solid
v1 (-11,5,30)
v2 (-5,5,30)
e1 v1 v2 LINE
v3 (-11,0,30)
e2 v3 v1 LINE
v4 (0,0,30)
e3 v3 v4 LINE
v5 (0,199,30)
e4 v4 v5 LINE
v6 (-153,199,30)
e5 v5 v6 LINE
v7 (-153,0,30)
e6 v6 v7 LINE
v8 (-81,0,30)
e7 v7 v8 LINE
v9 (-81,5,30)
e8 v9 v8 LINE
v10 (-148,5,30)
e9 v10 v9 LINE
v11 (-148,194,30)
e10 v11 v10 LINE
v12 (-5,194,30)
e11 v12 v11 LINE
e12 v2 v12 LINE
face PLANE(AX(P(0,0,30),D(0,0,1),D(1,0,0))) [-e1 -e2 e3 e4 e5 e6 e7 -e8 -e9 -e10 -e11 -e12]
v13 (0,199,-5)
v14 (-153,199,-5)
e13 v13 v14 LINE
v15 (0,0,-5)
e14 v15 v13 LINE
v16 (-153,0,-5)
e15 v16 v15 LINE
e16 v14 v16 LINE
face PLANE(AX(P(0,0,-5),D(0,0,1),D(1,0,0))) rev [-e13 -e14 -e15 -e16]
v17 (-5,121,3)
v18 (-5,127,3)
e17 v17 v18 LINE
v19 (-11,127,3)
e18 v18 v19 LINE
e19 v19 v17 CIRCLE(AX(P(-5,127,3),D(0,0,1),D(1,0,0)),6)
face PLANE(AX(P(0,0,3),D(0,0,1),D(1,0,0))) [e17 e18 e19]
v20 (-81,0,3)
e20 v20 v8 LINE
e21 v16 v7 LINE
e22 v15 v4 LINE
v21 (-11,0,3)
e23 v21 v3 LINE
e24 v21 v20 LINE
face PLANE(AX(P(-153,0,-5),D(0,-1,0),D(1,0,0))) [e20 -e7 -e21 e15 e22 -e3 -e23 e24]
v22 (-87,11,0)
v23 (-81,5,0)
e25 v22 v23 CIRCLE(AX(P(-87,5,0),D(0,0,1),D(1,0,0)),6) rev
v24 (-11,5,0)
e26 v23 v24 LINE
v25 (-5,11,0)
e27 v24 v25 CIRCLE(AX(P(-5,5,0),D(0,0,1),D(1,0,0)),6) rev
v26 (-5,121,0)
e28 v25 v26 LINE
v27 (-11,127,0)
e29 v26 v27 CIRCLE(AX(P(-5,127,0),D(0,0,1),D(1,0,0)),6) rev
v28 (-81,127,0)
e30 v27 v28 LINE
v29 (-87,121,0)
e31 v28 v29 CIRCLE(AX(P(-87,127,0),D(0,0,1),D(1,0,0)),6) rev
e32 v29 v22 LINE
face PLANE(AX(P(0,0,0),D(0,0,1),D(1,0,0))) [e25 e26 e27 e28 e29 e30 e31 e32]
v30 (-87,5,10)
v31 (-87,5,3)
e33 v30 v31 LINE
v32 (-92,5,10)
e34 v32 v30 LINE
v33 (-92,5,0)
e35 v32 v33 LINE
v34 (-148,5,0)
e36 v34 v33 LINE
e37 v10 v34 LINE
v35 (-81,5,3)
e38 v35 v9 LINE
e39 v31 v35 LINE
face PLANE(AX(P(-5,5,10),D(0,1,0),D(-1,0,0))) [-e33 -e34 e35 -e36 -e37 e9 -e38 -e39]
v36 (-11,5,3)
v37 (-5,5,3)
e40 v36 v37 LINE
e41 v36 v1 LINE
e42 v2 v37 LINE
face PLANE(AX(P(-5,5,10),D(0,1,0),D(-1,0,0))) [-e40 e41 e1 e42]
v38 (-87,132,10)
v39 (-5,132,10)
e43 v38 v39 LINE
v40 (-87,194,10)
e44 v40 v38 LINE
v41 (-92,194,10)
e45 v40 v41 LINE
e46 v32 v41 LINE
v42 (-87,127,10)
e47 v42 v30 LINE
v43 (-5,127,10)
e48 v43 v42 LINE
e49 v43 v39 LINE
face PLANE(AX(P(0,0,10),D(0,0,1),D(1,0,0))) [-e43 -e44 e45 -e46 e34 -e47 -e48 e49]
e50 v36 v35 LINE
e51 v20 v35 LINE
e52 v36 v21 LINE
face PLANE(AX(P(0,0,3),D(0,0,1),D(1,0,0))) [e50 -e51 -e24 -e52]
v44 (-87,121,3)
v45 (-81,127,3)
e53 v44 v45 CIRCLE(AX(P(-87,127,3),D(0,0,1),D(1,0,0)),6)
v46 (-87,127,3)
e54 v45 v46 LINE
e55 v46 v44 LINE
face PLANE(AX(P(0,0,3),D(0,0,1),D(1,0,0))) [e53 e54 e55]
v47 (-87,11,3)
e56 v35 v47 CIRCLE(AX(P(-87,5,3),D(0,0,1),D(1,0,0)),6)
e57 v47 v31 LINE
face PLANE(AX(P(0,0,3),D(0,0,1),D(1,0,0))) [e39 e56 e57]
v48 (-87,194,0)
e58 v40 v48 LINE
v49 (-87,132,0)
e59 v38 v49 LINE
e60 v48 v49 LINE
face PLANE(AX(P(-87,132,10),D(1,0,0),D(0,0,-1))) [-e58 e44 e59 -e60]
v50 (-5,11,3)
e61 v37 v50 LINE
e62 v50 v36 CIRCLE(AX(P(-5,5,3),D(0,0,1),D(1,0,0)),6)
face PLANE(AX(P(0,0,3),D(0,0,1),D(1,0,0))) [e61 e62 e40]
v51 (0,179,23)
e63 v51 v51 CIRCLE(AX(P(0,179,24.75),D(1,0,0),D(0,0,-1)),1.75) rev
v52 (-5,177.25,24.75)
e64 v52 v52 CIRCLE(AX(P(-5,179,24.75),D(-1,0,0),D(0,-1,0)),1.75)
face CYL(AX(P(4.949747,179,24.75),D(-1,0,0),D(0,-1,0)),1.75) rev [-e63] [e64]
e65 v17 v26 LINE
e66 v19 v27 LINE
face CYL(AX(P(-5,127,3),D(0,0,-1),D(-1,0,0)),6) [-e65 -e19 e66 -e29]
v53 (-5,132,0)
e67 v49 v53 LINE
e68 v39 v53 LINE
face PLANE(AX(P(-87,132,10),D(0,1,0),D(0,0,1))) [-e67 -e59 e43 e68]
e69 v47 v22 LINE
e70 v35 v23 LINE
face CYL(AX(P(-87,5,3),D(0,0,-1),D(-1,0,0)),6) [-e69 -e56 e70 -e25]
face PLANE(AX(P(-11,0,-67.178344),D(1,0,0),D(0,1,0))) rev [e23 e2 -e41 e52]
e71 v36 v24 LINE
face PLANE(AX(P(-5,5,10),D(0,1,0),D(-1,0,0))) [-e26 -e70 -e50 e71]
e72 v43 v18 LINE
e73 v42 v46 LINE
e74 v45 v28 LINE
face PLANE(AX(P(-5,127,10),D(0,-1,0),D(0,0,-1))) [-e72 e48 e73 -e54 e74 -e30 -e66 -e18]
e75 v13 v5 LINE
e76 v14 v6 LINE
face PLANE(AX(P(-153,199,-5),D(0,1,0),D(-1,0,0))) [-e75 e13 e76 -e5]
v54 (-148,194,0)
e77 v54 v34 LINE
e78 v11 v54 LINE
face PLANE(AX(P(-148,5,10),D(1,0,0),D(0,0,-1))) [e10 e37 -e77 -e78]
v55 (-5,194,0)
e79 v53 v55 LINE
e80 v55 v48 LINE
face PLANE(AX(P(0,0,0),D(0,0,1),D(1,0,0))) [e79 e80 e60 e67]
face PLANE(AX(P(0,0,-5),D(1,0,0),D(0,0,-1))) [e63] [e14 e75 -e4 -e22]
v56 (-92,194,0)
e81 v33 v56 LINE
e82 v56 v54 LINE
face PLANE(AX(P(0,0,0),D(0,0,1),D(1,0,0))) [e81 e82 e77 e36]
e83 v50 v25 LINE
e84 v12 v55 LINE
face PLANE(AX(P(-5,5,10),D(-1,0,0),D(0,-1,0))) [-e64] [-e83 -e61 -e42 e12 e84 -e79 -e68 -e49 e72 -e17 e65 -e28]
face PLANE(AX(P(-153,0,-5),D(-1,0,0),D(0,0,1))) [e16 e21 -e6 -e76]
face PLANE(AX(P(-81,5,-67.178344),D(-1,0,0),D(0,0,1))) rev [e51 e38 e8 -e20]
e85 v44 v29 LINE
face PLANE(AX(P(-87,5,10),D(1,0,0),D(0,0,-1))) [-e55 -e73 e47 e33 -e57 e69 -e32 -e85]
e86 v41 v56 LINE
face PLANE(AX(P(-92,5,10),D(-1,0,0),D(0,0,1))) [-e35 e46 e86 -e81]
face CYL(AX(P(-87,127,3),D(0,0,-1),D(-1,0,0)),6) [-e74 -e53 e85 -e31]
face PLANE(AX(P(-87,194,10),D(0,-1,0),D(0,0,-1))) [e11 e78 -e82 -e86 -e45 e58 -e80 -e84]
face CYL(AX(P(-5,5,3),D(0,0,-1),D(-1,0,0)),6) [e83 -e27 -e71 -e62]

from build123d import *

# Parameters (mm, degrees)
SKETCH1_W           = 199
SKETCH1_H           = 153
BOSS_EXTRUDE1_DEPTH = 5
SKETCH2_W           = 153
SKETCH2_H           = 199
SKETCH2_W_2         = 82
SKETCH2_H_2         = 122
SKETCH2_H_3         = 62
SKETCH2_W_3         = 56
SKETCH2_H_4         = 189
BOSS_EXTRUDE2_DEPTH = 10
SKETCH3_W           = 153
SKETCH3_H           = 199
SKETCH3_W_2         = 143
SKETCH3_H_2         = 189
BOSS_EXTRUDE3_DEPTH = 20
SKETCH4_W           = 6
SKETCH4_H           = 6
BOSS_EXTRUDE4_DEPTH = 3
FILLET1_R           = 6
SKETCH5_W           = 70
SKETCH5_H           = 5
CUT_EXTRUDE1_DEPTH  = 27
SKETCH6_R           = 1.75
CUT_EXTRUDE2_DEPTH  = 5


with BuildPart() as part:
    # Sketch1 → Boss-Extrude1 (new body)
    with BuildSketch(Plane(origin=(0, 0, 0), x_dir=(0, 1, 0), z_dir=(0, 0, 1))):
        with Locations((99.5, 76.5)):
            Rectangle(SKETCH1_W, SKETCH1_H)
    extrude(amount=-BOSS_EXTRUDE1_DEPTH)

    # Sketch2 → Boss-Extrude2 (add)
    with BuildSketch(Plane.XY):
        with Locations((-76.5, 99.5)):
            Rectangle(SKETCH2_W, SKETCH2_H)
        with Locations((-46, 66)):
            Rectangle(SKETCH2_W_2, SKETCH2_H_2, mode=Mode.SUBTRACT)
        with Locations((-46, 163)):
            Rectangle(SKETCH2_W_2, SKETCH2_H_3, mode=Mode.SUBTRACT)
        with Locations((-120, 99.5)):
            Rectangle(SKETCH2_W_3, SKETCH2_H_4, mode=Mode.SUBTRACT)
    extrude(amount=BOSS_EXTRUDE2_DEPTH)

    # Sketch3 → Boss-Extrude3 (add)
    with BuildSketch(Plane.XY.offset(10)):
        with Locations((-76.5, 99.5)):
            Rectangle(SKETCH3_W, SKETCH3_H)
        with Locations((-76.5, 99.5)):
            Rectangle(SKETCH3_W_2, SKETCH3_H_2, mode=Mode.SUBTRACT)
    extrude(amount=BOSS_EXTRUDE3_DEPTH)

    # Sketch4 → Boss-Extrude4 (add)
    with BuildSketch(Plane.XY):
        with Locations((-84, 124)):
            Rectangle(SKETCH4_W, SKETCH4_H)
        with Locations((-8, 124)):
            Rectangle(SKETCH4_W, SKETCH4_H)
        with Locations((-8, 8)):
            Rectangle(SKETCH4_W, SKETCH4_H)
        with Locations((-84, 8)):
            Rectangle(SKETCH4_W, SKETCH4_H)
    extrude(amount=BOSS_EXTRUDE4_DEPTH)

    # Fillet1
    fillet1_edges = [part.edges().sort_by_distance(p)[0] for p in [
        (-81, 11, 1.5),
        (-11, 11, 1.5),
        (-81, 121, 1.5),
        (-11, 121, 1.5),
    ]]
    fillet(fillet1_edges, radius=FILLET1_R - 0.0001)  # a hair under: the kernel refuses the full size

    # Sketch5 → Cut-Extrude1 (cut)
    with BuildSketch(Plane.XY.offset(30)):
        with Locations((-46, 2.5)):
            Rectangle(SKETCH5_W, SKETCH5_H)
    extrude(amount=-CUT_EXTRUDE1_DEPTH, mode=Mode.SUBTRACT)

    # Sketch6 → Cut-Extrude2 (cut)
    with BuildSketch(Plane(origin=(-5, 0, 0), x_dir=(0, -1, 0), z_dir=(-1, 0, 0))):
        with Locations((-179, 24.75)):
            Circle(SKETCH6_R)
    extrude(amount=-CUT_EXTRUDE2_DEPTH, mode=Mode.SUBTRACT)


solid = part.part
